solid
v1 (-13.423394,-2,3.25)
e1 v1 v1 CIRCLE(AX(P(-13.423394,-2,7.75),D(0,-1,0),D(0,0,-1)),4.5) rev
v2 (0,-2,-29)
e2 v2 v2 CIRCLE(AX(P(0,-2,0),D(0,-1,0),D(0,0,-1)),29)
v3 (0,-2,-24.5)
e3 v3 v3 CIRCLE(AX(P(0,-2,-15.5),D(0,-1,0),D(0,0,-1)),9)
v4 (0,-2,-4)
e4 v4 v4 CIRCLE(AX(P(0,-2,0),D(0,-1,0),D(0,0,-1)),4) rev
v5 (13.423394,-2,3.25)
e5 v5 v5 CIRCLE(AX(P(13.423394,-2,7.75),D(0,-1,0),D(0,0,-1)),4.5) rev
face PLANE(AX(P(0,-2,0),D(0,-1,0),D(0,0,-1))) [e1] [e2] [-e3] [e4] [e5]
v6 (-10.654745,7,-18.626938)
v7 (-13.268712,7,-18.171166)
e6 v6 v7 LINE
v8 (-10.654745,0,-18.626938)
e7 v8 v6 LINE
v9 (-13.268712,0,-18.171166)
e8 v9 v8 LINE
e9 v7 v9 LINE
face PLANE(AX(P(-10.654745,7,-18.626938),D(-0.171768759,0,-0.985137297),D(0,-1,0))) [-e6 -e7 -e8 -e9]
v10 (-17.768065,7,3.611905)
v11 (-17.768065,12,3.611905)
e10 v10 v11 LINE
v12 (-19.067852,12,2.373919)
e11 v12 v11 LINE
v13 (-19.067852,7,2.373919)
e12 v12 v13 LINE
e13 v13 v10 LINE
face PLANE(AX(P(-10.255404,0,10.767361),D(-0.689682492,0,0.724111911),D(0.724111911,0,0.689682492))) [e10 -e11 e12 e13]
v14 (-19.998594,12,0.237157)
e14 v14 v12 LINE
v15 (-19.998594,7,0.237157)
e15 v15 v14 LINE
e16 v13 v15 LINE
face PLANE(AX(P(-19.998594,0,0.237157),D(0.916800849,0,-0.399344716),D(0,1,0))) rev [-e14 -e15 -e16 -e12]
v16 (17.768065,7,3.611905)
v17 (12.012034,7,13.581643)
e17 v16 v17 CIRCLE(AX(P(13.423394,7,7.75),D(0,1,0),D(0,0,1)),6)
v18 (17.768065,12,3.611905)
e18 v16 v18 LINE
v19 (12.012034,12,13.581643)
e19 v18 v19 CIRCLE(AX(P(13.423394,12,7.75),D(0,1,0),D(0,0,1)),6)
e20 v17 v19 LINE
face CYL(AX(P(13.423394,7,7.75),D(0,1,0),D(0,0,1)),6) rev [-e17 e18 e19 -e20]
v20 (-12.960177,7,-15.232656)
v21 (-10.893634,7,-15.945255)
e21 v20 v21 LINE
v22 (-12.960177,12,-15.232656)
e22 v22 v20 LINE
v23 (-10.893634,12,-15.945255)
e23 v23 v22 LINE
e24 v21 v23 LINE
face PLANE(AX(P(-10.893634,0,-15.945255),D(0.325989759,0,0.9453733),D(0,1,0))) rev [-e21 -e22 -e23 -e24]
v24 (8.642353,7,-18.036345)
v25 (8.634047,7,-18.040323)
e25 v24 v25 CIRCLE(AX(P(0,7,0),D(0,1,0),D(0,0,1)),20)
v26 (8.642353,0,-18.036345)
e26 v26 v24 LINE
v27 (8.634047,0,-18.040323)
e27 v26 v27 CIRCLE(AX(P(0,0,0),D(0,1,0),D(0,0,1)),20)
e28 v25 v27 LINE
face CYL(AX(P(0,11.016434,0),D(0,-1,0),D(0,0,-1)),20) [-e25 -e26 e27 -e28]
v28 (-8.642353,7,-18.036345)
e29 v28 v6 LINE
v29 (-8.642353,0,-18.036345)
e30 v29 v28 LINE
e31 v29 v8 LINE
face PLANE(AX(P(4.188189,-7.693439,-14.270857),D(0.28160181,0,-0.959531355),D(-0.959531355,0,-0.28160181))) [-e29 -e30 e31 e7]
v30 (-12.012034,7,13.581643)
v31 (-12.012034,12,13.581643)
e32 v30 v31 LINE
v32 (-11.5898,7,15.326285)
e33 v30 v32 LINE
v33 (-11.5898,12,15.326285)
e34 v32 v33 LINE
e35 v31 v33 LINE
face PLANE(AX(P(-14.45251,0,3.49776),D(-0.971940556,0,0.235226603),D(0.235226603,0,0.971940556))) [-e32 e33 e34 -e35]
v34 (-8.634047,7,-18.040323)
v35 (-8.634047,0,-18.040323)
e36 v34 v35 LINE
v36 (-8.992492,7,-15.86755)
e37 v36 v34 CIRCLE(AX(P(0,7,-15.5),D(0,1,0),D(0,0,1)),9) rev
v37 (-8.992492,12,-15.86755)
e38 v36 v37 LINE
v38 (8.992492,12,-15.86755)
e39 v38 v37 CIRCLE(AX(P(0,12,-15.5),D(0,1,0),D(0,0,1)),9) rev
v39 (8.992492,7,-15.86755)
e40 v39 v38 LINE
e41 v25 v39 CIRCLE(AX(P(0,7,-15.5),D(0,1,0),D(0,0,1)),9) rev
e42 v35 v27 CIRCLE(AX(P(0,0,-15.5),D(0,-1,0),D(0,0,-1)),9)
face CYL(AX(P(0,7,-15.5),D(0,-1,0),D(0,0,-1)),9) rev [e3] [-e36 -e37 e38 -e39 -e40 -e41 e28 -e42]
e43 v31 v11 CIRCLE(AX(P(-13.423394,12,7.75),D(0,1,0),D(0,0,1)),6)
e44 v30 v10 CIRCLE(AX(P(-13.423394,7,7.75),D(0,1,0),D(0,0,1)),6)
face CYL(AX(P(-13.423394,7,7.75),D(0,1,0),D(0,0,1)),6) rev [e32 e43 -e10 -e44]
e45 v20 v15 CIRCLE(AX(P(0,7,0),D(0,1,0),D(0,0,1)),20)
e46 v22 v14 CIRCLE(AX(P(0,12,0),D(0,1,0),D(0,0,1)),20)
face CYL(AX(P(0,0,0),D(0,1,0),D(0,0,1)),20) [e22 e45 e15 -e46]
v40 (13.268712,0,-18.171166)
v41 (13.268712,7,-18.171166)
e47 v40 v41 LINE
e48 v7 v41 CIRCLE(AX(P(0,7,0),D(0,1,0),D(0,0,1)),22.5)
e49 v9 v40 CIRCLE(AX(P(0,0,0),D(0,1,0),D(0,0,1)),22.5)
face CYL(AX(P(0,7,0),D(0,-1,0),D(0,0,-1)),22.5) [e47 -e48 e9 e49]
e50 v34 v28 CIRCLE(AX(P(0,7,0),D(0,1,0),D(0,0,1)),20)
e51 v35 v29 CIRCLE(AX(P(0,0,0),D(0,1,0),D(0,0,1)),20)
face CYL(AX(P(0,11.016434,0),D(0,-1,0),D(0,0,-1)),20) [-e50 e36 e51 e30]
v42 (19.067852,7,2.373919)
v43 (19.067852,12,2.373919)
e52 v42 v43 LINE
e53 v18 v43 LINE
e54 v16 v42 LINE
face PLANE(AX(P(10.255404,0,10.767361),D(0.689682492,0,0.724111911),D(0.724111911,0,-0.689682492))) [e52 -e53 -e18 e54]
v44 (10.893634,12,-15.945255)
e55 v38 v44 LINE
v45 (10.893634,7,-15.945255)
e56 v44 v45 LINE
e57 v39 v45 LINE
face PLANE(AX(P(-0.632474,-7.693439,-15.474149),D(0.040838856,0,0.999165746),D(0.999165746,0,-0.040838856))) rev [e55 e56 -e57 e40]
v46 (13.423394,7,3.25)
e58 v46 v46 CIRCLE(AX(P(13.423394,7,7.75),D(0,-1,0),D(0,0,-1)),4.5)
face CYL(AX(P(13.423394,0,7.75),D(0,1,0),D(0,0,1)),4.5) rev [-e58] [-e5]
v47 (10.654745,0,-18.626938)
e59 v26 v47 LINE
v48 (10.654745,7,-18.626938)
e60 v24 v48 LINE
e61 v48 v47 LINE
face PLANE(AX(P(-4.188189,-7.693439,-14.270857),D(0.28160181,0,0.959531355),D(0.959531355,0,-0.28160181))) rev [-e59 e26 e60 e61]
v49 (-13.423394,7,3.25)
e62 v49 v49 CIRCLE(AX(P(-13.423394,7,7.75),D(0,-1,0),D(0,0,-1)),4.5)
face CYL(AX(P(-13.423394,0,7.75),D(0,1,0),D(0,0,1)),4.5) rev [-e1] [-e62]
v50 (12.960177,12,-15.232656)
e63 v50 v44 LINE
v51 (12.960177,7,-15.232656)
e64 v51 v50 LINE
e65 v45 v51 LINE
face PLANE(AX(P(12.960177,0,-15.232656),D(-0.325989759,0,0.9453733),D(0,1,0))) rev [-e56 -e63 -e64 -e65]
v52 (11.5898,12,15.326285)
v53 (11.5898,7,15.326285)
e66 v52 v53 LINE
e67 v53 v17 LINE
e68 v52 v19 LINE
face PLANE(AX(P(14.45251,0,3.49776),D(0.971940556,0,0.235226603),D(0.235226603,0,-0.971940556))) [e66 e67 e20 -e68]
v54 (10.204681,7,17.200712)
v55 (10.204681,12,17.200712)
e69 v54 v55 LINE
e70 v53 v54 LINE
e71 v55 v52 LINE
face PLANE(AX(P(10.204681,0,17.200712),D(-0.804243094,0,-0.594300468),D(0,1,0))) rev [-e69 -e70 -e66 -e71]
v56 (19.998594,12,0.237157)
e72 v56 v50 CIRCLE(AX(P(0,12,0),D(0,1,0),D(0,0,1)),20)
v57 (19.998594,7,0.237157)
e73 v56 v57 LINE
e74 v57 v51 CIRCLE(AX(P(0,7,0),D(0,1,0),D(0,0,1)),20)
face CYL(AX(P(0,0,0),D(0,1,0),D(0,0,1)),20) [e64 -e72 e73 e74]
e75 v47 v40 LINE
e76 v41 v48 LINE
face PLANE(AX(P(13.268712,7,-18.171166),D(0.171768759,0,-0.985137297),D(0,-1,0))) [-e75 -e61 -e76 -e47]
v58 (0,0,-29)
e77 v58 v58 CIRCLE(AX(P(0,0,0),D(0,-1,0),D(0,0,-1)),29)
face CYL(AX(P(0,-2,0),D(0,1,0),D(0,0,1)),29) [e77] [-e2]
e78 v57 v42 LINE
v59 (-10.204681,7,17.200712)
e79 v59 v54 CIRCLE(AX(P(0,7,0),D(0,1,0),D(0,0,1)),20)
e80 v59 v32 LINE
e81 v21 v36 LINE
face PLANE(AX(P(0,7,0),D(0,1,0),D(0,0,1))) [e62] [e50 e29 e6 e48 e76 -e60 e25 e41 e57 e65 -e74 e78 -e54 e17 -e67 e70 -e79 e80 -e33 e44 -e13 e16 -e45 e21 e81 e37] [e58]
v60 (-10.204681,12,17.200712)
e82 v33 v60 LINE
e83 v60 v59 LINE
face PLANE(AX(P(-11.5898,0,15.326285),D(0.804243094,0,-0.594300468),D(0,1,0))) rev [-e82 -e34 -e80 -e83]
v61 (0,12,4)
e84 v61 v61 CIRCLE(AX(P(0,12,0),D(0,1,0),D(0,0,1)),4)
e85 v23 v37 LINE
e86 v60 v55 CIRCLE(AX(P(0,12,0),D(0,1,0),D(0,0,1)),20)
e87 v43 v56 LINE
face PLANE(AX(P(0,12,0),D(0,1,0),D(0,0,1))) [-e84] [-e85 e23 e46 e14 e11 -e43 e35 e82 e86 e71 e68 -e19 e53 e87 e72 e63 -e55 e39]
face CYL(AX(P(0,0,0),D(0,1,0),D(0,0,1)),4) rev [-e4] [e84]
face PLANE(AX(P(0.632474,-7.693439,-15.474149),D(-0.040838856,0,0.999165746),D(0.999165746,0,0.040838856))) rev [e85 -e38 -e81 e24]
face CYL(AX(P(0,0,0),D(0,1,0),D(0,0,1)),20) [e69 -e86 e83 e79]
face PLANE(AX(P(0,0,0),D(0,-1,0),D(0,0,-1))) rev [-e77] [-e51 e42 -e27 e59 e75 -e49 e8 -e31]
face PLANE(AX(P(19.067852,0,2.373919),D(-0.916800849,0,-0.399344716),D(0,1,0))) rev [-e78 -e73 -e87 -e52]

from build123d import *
from build123d.topology import SkipClean

# Parameters (mm, degrees)
BOSS_EXTRUDE1_DEPTH      = 7
BOSS_EXTRUDE3_DEPTH      = 5
BOSS_EXTRUDE3_DEPTH_BACK = 7
BOSS_EXTRUDE5_DEPTH      = 7
CUT_EXTRUDE1_START       = -5
CUT_EXTRUDE1_DEPTH       = 5
SKETCH5_R                = 4
CUT_EXTRUDE2_DEPTH       = 35.007352146
BOSS_EXTRUDE7_START      = 2
SKETCH6_R                = 29
SKETCH6_R_2              = 4.5
SKETCH6_R_3              = 4
BOSS_EXTRUDE7_DEPTH      = 2
CUT_EXTRUDE6_START       = -12
CUT_EXTRUDE6_DEPTH       = 12
BOSS_EXTRUDE8_DEPTH      = 7


with BuildPart() as part:
    # Sketch1 → Boss-Extrude1 (new body)
    with BuildSketch(Plane(origin=(0, 0, 0), x_dir=(1, 0, 0), z_dir=(0, 1, 0))):
        with BuildLine():
            ThreePointArc((21.960068583, -4.899529347), (22.364609801, -2.464594985), (22.5, 0))
            ThreePointArc((22.5, 0), (18.136022741, 13.316706768), (6.73691741, 21.467741935))
            ThreePointArc((6.73691741, 21.467741935), (8.415231925, 18.691217895), (9, 15.5))
            ThreePointArc((9, 15.5), (-3.191217895, 7.084768075), (-6.73691741, 21.467741935))
            ThreePointArc((-6.73691741, 21.467741935), (-19.485571585, 11.25), (-21.960068583, -4.899529347))
            ThreePointArc((-21.960068583, -4.899529347), (-11.979453563, 1.133413573), (-4.423393759, -7.75))
            ThreePointArc((-4.423393759, -7.75), (-7.731198081, -14.721291729), (-15.223151173, -16.568212588))
            ThreePointArc((-15.223151173, -16.568212588), (0, -22.5), (15.223151173, -16.568212588))
            ThreePointArc((15.223151173, -16.568212588), (5.629165125, -3.25), (21.960068583, -4.899529347))
        make_face()
    extrude(amount=BOSS_EXTRUDE1_DEPTH)

    # Sketch2 → Boss-Extrude3 (add, two sides: drawn at the far end of the back side and taken through both)
    with BuildSketch(Plane(origin=(0, 7, 0), x_dir=(1, 0, 0), z_dir=(0, 1, 0)).offset(-BOSS_EXTRUDE3_DEPTH_BACK)):
        with BuildLine():
            ThreePointArc((-11.306354333, -16.497465008), (0, -20), (11.306354333, -16.497465008))
            Line((11.306354333, -16.497465008), (12.364874046, -12.123732504))
            ThreePointArc((12.364874046, -12.123732504), (9.526279442, -5.5), (16.68189736, -4.646428786))
            Line((16.68189736, -4.646428786), (19.940400962, -1.542857572))
            ThreePointArc((19.940400962, -1.542857572), (17.320508076, 10), (8.634046629, 18.040322581))
            ThreePointArc((8.634046629, 18.040322581), (0, 6.5), (-8.634046629, 18.040322581))
            ThreePointArc((-8.634046629, 18.040322581), (-17.320508076, 10), (-19.940400962, -1.542857572))
            Line((-19.940400962, -1.542857572), (-16.68189736, -4.646428786))
            ThreePointArc((-16.68189736, -4.646428786), (-9.526279442, -5.5), (-12.364874046, -12.123732504))
            Line((-12.364874046, -12.123732504), (-11.306354333, -16.497465008))
        make_face()
    extrude(amount=BOSS_EXTRUDE3_DEPTH + BOSS_EXTRUDE3_DEPTH_BACK)

    # Sketch3 → Boss-Extrude5 (add)
    with SkipClean():  # the faces are left unmerged after this step: merging them gives an invalid solid
        with BuildSketch(Plane.XZ):
            with BuildLine():
                ThreePointArc((-11.306354333, 16.497465008), (-13.260856767, 16.748532198), (-15.223151173, 16.568212588))
                ThreePointArc((-15.223151173, 16.568212588), (-19.485571585, 11.25), (-21.960068583, 4.899529347))
                ThreePointArc((-21.960068583, 4.899529347), (-21.135082743, 3.109972737), (-19.940400962, 1.542857572))
                Line((-19.940400962, 1.542857572), (-16.68189736, 4.646428786))
                ThreePointArc((-16.68189736, 4.646428786), (-17.320508076, 10), (-12.364874046, 12.123732504))
                Line((-12.364874046, 12.123732504), (-11.306354333, 16.497465008))
            make_face()
            with BuildLine():
                ThreePointArc((-19.940400962, 1.542857572), (-5.629165125, 3.25), (-11.306354333, 16.497465008))
                Line((-11.306354333, 16.497465008), (-12.364874046, 12.123732504))
                ThreePointArc((-12.364874046, 12.123732504), (-9.886916789, 10.532684072), (-8.923393759, 7.75))
                ThreePointArc((-8.923393759, 7.75), (-11.7520569, 3.571886418), (-16.68189736, 4.646428786))
                Line((-16.68189736, 4.646428786), (-19.940400962, 1.542857572))
            make_face()
            with BuildLine():
                Line((16.68189736, 4.646428786), (19.940400962, 1.542857572))
                ThreePointArc((19.940400962, 1.542857572), (21.135082743, 3.109972737), (21.960068583, 4.899529347))
                ThreePointArc((21.960068583, 4.899529347), (19.485571585, 11.25), (15.223151173, 16.568212588))
                ThreePointArc((15.223151173, 16.568212588), (13.260856767, 16.748532198), (11.306354333, 16.497465008))
                Line((11.306354333, 16.497465008), (12.364874046, 12.123732504))
                ThreePointArc((12.364874046, 12.123732504), (16.206077831, 11.286476969), (17.923393759, 7.75))
                ThreePointArc((17.923393759, 7.75), (17.601507341, 6.078663141), (16.68189736, 4.646428786))
            make_face()
            with BuildLine():
                ThreePointArc((11.306354333, 16.497465008), (5.629165125, 3.25), (19.940400962, 1.542857572))
                Line((19.940400962, 1.542857572), (16.68189736, 4.646428786))
                ThreePointArc((16.68189736, 4.646428786), (9.526279442, 5.5), (12.364874046, 12.123732504))
                Line((12.364874046, 12.123732504), (11.306354333, 16.497465008))
            make_face()
        extrude(amount=-BOSS_EXTRUDE5_DEPTH)

    # Sketch4 → Cut-Extrude1 (cut)
    with SkipClean():  # the faces are left unmerged after this step: merging them gives an invalid solid
        with BuildSketch(Plane(origin=(0, 12, 0), x_dir=(1, 0, 0), z_dir=(0, 1, 0)).offset(CUT_EXTRUDE1_START)):
            with BuildLine():
                ThreePointArc((-17.768065227, -3.611905048), (-18.619546181, -10.75), (-12.012034142, -13.581643339))
                Line((-12.012034142, -13.581643339), (-12.364874046, -12.123732504))
                ThreePointArc((-12.364874046, -12.123732504), (-9.526279442, -5.5), (-16.68189736, -4.646428786))
                Line((-16.68189736, -4.646428786), (-17.768065227, -3.611905048))
            make_face()
            with BuildLine():
                Line((-12.364874046, -12.123732504), (-12.012034142, -13.581643339))
                ThreePointArc((-12.012034142, -13.581643339), (-8.708091133, -11.46024543), (-7.423393759, -7.75))
                ThreePointArc((-7.423393759, -7.75), (-11.194944613, -2.179181891), (-17.768065227, -3.611905048))
                Line((-17.768065227, -3.611905048), (-16.68189736, -4.646428786))
                ThreePointArc((-16.68189736, -4.646428786), (-9.526279442, -5.5), (-12.364874046, -12.123732504))
            make_face()
            with BuildLine():
                ThreePointArc((12.364874046, -12.123732504), (9.526279442, -5.5), (16.68189736, -4.646428786))
                Line((16.68189736, -4.646428786), (17.768065227, -3.611905048))
                ThreePointArc((17.768065227, -3.611905048), (8.227241336, -4.75), (12.012034142, -13.581643339))
                Line((12.012034142, -13.581643339), (12.364874046, -12.123732504))
            make_face()
            with BuildLine():
                Line((17.768065227, -3.611905048), (16.68189736, -4.646428786))
                ThreePointArc((16.68189736, -4.646428786), (9.526279442, -5.5), (12.364874046, -12.123732504))
                Line((12.364874046, -12.123732504), (12.012034142, -13.581643339))
                ThreePointArc((12.012034142, -13.581643339), (17.133639188, -12.465302626), (19.423393759, -7.75))
                ThreePointArc((19.423393759, -7.75), (18.994211868, -5.521550855), (17.768065227, -3.611905048))
            make_face()
        extrude(amount=CUT_EXTRUDE1_DEPTH, mode=Mode.SUBTRACT)

    # Sketch5 → Cut-Extrude2 (cut, through all)
    with SkipClean():  # the faces are left unmerged after this step: merging them gives an invalid solid
        with BuildSketch(Plane(origin=(0, 12, 0), x_dir=(1, 0, 0), z_dir=(0, 1, 0))):
            with Locations(Location((0, 0, 0), (0, 0, 270))):
                Circle(SKETCH5_R)
        extrude(amount=-CUT_EXTRUDE2_DEPTH, mode=Mode.SUBTRACT)

    # Sketch6 → Boss-Extrude7 (add)
    # profile 1 of 2: a face of its own
    with SkipClean():  # the faces are left unmerged after this step: merging them gives an invalid solid
        with BuildSketch(Plane.XZ.offset(BOSS_EXTRUDE7_START)):
            with Locations(Location((0, 0, 0), (0, 0, 270))):
                Circle(SKETCH6_R)
            with BuildLine():
                ThreePointArc((6.73691741, -21.467741935), (0, -24.5), (-6.73691741, -21.467741935))
                ThreePointArc((-6.73691741, -21.467741935), (0, 22.5), (6.73691741, -21.467741935))
            make_face(mode=Mode.SUBTRACT)
        # profile 2 of 2: a face of its own
        with BuildSketch(Plane.XZ.offset(BOSS_EXTRUDE7_START)):
            with BuildLine():
                ThreePointArc((6.73691741, -21.467741935), (0, 22.5), (-6.73691741, -21.467741935))
                ThreePointArc((-6.73691741, -21.467741935), (0, -6.5), (6.73691741, -21.467741935))
            make_face()
            with Locations(Location((-13.423393759, 7.75, 0), (0, 0, 270))):
                Circle(SKETCH6_R_2, mode=Mode.SUBTRACT)
            with Locations(Location((13.423393759, 7.75, 0), (0, 0, 270))):
                Circle(SKETCH6_R_2, mode=Mode.SUBTRACT)
            with Locations(Location((0, 0, 0), (0, 0, 90))):
                Circle(SKETCH6_R_3, mode=Mode.SUBTRACT)
        extrude(amount=-BOSS_EXTRUDE7_DEPTH)

    # Sketch7 → Cut-Extrude6 (cut)
    with SkipClean():  # the faces are left unmerged after this step: merging them gives an invalid solid
        with BuildSketch(Plane(origin=(0, 12, 0), x_dir=(1, 0, 0), z_dir=(0, 1, 0)).offset(CUT_EXTRUDE6_START)):
            with BuildLine():
                ThreePointArc((8.634046629, 18.040322581), (8.638200135, 18.038334137), (8.642353183, 18.036344737))
                Line((8.642353183, 18.036344737), (12.012034142, 19.025273606))
                ThreePointArc((12.012034142, 19.025273606), (9.453687585, 20.417585338), (6.73691741, 21.467741935))
                ThreePointArc((6.73691741, 21.467741935), (7.874225977, 19.858504935), (8.634046629, 18.040322581))
            make_face()
            with BuildLine():
                ThreePointArc((8.634046629, 18.040322581), (8.634914915, 18.037369585), (8.635782192, 18.034416292))
                Line((8.635782192, 18.034416292), (8.642353183, 18.036344737))
                ThreePointArc((8.642353183, 18.036344737), (8.638200135, 18.038334137), (8.634046629, 18.040322581))
            make_face()
            with BuildLine():
                Line((8.642353183, 18.036344737), (8.635782192, 18.034416292))
                ThreePointArc((8.635782192, 18.034416292), (8.880475096, 16.961903579), (8.992491714, 15.8675497))
                Line((8.992491714, 15.8675497), (12.012034142, 15.990967319))
                ThreePointArc((12.012034142, 15.990967319), (10.377707894, 17.09687629), (8.642353183, 18.036344737))
            make_face()
            with BuildLine():
                ThreePointArc((-6.73691741, 21.467741935), (-9.453687585, 20.417585338), (-12.012034142, 19.025273606))
                Line((-12.012034142, 19.025273606), (-8.642353183, 18.036344737))
                ThreePointArc((-8.642353183, 18.036344737), (-8.638200135, 18.038334137), (-8.634046629, 18.040322581))
                ThreePointArc((-8.634046629, 18.040322581), (-7.874225977, 19.858504935), (-6.73691741, 21.467741935))
            make_face()
            with BuildLine():
                Line((-12.012034142, 15.990967319), (-8.992491714, 15.8675497))
                ThreePointArc((-8.992491714, 15.8675497), (-8.880475096, 16.961903579), (-8.635782192, 18.034416292))
                Line((-8.635782192, 18.034416292), (-8.642353183, 18.036344737))
                ThreePointArc((-8.642353183, 18.036344737), (-10.377707894, 17.09687629), (-12.012034142, 15.990967319))
            make_face()
            with BuildLine():
                Line((-8.642353183, 18.036344737), (-8.635782192, 18.034416292))
                ThreePointArc((-8.635782192, 18.034416292), (-8.634914915, 18.037369585), (-8.634046629, 18.040322581))
                ThreePointArc((-8.634046629, 18.040322581), (-8.638200135, 18.038334137), (-8.642353183, 18.036344737))
            make_face()
        extrude(amount=CUT_EXTRUDE6_DEPTH, mode=Mode.SUBTRACT)

    # Sketch8 → Boss-Extrude8 (add)
    with SkipClean():  # the faces are left unmerged after this step: merging them gives an invalid solid
        with BuildSketch(Plane(origin=(0, 0, 0), x_dir=(1, 0, 0), z_dir=(0, 1, 0))):
            with BuildLine():
                Line((-12.012034142, 15.990967319), (-8.992491714, 15.8675497))
                ThreePointArc((-8.992491714, 15.8675497), (-8.879974605, 16.96494062), (-8.634046629, 18.040322581))
                ThreePointArc((-8.634046629, 18.040322581), (-10.37377111, 17.099265275), (-12.012034142, 15.990967319))
            make_face()
            with BuildLine():
                Line((8.992491714, 15.8675497), (12.012034142, 15.990967319))
                ThreePointArc((12.012034142, 15.990967319), (10.37377111, 17.099265275), (8.634046629, 18.040322581))
                ThreePointArc((8.634046629, 18.040322581), (8.879974605, 16.96494062), (8.992491714, 15.8675497))
            make_face()
        extrude(amount=BOSS_EXTRUDE8_DEPTH)

    # Fillet1
    # the kernel refuses this chamfer: 3 mm, written as the material it takes off along each edge
    with BuildSketch(Plane(origin=(12.012034142, 7, -15.990967319), x_dir=(0.7995517704478904, 0, 0.6005971747965888), z_dir=(0, 1, 0))) as fillet1_piece_1:
        with BuildLine():
            Line((1.213528757, -0.036857141), (-0.866764272, -0.70825745))
            Line((-0.866764272, -0.70825745), (0, 0))
            ThreePointArc((0, 0), (0.66349858, -0.011012552), (1.213528757, -0.036857141))
        make_face()
    extrude(amount=8.319320921, mode=Mode.SUBTRACT)
    with BuildSketch(Plane(origin=(12.012034142, 0, -19.025273606), x_dir=(0.8437207298406628, 0, 0.5367823861092493), z_dir=(0, 1, 0))) as fillet1_piece_2:
        with BuildLine():
            Line((1.518754527, -0.046065538), (-0.931353915, -1.064652801))
            Line((-0.931353915, -1.064652801), (0, 0))
            ThreePointArc((0, 0), (0.814389338, -0.011931871), (1.518754527, -0.046065538))
        make_face()
    extrude(amount=11.073901279, mode=Mode.SUBTRACT)
    with BuildSketch(Plane(origin=(-12.012034142, 7, -15.990967319), x_dir=(-0.799551770447954, 0, 0.6005971747965038), z_dir=(0, 1, 0))) as fillet1_piece_3:
        with BuildLine():
            Line((1.213528757, 0.036857141), (-0.866764272, 0.70825745))
            Line((-0.866764272, 0.70825745), (0, 0))
            ThreePointArc((0, 0), (0.66349858, 0.011012552), (1.213528757, 0.036857141))
        make_face()
    extrude(amount=8.319320921, mode=Mode.SUBTRACT)
    with BuildSketch(Plane(origin=(-12.012034142, 0, -19.025273606), x_dir=(-0.843720729840673, 0, 0.5367823861092332), z_dir=(0, 1, 0))) as fillet1_piece_4:
        with BuildLine():
            Line((1.518754527, 0.046065538), (-0.931353915, 1.064652801))
            Line((-0.931353915, 1.064652801), (0, 0))
            ThreePointArc((0, 0), (0.814389338, 0.011931871), (1.518754527, 0.046065538))
        make_face()
    extrude(amount=11.073901279, mode=Mode.SUBTRACT)
    with BuildSketch(Plane(origin=(19.940400962, 7, 1.542857572), x_dir=(-0.6992361724703339, 0, 0.7148907434769579), z_dir=(0, 1, 0))) as fillet1_piece_5:
        with BuildLine():
            Line((1.204235817, -0.042668697), (-0.974123895, -0.87139156))
            ThreePointArc((-0.974123895, -0.87139156), (-0.535859817, -0.465123865), (0, 0))
            Line((0, 0), (1.204235817, -0.042668697))
        make_face()
    extrude(amount=8.549220137, mode=Mode.SUBTRACT)
    with BuildSketch(Plane(origin=(11.306354333, 7, 16.497465008), x_dir=(-0.826230478481032, 0, 0.5633322256262328), z_dir=(0, 1, 0)), Plane(origin=(-11.306354333, 15.549220137, 16.497465008), x_dir=(0.8262304784811115, 0, 0.5633322256261161), z_dir=(0, -1, 0))) as fillet1_piece_6:
        with BuildLine():
            Line((1.306397829, -0.039564186), (-0.893955271, -0.807990405))
            Line((-0.893955271, -0.807990405), (0, 0))
            ThreePointArc((0, 0), (0.70948401, -0.01088084), (1.306397829, -0.039564186))
        make_face()
    extrude(amount=8.549220137, mode=Mode.SUBTRACT)
    with BuildSketch(Plane(origin=(-19.940400962, 7, 1.542857572), x_dir=(0.6992361724705505, 0, 0.7148907434767461), z_dir=(0, 1, 0))) as fillet1_piece_7:
        with BuildLine():
            Line((1.204235817, 0.042668697), (-0.974123895, 0.87139156))
            ThreePointArc((-0.974123895, 0.87139156), (-0.535859817, 0.465123865), (0, 0))
            Line((0, 0), (1.204235817, 0.042668697))
        make_face()
    extrude(amount=8.549220137, mode=Mode.SUBTRACT)


solid = part.part
